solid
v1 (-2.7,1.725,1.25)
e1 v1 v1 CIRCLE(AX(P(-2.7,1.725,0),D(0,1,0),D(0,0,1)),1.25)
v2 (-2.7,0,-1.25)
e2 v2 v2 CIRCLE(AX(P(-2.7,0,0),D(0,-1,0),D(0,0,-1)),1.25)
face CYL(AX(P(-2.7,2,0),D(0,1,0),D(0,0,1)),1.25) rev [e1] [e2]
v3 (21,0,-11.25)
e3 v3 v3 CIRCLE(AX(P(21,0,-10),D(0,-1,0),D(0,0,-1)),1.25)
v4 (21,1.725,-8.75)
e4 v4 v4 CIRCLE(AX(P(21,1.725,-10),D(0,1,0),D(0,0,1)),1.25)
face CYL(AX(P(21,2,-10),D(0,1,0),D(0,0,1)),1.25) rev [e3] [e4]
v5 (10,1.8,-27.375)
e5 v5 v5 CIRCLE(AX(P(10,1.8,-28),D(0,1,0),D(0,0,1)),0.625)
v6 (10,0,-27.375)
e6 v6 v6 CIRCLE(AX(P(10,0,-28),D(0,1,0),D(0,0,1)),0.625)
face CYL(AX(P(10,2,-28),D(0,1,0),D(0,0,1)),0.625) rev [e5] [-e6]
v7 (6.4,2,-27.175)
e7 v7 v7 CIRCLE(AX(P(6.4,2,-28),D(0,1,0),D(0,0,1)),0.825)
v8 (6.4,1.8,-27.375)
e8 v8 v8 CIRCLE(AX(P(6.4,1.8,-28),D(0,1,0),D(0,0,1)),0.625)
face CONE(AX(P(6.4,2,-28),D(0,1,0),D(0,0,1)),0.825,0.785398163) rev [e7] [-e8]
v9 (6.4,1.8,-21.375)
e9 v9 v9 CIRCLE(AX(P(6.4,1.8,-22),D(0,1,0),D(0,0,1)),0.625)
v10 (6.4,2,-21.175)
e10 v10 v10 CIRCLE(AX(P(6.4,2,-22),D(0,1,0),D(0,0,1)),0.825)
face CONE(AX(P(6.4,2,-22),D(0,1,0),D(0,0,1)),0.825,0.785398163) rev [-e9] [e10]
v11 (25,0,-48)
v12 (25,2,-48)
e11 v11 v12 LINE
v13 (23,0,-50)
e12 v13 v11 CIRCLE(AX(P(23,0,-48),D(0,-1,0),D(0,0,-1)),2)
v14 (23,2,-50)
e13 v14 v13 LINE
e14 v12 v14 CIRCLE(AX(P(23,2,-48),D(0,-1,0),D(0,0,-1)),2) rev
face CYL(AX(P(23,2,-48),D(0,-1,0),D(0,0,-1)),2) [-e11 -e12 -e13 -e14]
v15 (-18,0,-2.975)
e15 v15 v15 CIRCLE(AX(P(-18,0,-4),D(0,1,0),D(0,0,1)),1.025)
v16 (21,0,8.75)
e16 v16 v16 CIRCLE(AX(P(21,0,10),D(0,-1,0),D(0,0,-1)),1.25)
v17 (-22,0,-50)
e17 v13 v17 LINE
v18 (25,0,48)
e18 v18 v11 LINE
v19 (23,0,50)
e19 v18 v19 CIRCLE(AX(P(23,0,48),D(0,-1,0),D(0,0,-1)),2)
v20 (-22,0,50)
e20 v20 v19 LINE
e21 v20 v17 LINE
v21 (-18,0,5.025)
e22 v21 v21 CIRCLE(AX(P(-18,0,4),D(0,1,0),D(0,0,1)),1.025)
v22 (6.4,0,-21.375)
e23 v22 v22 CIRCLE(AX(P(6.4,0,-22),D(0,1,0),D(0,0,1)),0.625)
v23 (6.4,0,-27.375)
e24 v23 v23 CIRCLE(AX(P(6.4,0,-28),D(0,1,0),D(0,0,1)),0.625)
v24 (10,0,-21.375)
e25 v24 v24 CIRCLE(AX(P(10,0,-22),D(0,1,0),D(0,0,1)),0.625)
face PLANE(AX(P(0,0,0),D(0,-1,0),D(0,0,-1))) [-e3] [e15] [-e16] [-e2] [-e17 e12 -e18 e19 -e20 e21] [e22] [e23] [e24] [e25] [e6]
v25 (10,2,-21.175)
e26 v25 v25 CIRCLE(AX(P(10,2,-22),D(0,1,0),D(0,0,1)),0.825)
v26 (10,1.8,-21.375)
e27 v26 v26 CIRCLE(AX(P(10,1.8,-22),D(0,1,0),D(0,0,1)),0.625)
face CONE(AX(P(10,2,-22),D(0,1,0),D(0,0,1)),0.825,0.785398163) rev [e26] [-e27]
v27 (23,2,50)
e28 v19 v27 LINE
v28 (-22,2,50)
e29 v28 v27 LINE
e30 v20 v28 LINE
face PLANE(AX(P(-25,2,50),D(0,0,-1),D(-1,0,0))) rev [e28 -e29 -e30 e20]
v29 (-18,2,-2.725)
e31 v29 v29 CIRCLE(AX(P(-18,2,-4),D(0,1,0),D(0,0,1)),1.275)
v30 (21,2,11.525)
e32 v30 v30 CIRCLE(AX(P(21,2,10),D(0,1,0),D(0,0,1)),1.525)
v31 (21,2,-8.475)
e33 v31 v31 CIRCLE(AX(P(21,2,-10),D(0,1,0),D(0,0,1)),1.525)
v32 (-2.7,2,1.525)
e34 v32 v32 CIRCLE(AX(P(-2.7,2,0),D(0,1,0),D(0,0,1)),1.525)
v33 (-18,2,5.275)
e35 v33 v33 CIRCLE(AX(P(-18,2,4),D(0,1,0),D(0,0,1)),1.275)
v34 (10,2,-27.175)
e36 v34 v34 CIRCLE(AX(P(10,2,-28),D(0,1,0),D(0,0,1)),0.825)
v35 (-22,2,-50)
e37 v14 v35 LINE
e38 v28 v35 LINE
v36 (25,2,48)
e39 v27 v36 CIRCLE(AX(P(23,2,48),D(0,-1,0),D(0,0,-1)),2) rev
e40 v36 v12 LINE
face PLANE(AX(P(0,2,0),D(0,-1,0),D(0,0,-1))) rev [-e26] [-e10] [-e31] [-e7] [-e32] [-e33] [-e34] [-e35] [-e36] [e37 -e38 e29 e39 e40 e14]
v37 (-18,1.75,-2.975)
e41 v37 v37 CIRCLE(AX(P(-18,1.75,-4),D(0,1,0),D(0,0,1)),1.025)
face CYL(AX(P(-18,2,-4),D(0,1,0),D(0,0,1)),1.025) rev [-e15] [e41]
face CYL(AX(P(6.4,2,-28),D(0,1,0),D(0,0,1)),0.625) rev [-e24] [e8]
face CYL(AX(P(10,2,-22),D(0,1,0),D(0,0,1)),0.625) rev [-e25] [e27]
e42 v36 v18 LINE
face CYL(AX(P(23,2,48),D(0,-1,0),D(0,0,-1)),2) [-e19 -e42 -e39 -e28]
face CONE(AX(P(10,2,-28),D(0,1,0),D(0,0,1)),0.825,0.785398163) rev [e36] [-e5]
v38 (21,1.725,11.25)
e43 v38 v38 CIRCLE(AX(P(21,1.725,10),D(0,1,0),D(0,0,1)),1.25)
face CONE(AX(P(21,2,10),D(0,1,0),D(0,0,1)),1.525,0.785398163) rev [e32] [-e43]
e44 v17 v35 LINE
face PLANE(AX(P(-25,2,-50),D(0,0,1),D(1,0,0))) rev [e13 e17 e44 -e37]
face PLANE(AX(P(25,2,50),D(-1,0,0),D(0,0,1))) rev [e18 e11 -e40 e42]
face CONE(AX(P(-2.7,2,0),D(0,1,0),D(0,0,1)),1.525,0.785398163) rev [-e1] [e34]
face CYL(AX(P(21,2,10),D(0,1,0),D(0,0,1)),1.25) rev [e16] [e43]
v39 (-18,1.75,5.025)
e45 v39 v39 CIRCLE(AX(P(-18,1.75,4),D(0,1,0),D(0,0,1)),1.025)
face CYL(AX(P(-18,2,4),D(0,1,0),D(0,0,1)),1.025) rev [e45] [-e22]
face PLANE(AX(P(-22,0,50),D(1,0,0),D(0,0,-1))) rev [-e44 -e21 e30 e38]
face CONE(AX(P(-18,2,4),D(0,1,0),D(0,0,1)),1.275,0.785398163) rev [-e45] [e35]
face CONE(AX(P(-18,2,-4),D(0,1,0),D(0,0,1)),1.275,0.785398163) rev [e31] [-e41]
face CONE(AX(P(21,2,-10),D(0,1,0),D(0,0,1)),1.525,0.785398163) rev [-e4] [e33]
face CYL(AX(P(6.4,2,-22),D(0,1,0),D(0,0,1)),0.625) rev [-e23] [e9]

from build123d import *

# Parameters (mm, degrees)
SKETCH_1_W                     = 50
SKETCH_1_H                     = 100
EXTRUDE_1_DEPTH                = 2
SKETCH_2_W                     = 3
SKETCH_2_H                     = 100
EXTRUDE_2_DEPTH                = 80
SKETCH_3_W                     = 2
SKETCH_3_H                     = 66.7
EXTRUDE_3_DEPTH                = 70
CUT_EXTRUDE_4_REACH            = 162.465
SKETCH_8_W                     = 2
SKETCH_8_H                     = 66.7
EXTRUDE_4_DEPTH                = 70
CUT_EXTRUDE_5_REACH            = 140.25
HOLE_WIZARD_M3_1_D             = 2.5
HOLE_WIZARD_M3_1_DEPTH         = 2
HOLE_WIZARD_M3_1_CSINK_D       = 3.05
HOLE_WIZARD_M3_1_CSINK_ANGLE   = 90
FILLET_1_R                     = 2
CUT_EXTRUDE_6_REACH            = 140.25
SKETCH_12_R                    = 11
CUT_EXTRUDE_7_REACH            = 162.465
SKETCH_13_R                    = 14.5
SKETCH_14_W                    = 2
SKETCH_14_H                    = 66.7
EXTRUDE_5_DEPTH                = 70
CUT_EXTRUDE_8_REACH            = 156.14
SKETCH_15_R                    = 5.1
CUT_EXTRUDE_9_DEPTH            = 155.140358116
CUT_EXTRUDE_9_DEPTH_BACK       = 155.140358116
SKETCH_19_W                    = 2
SKETCH_19_H                    = 66.7
CUT_EXTRUDE_10_DEPTH           = 119.844436134
FILLET_2_R                     = 2
HOLE_WIZARD_M3_3_D             = 2.5
HOLE_WIZARD_M3_3_CSINK_D       = 3.05
HOLE_WIZARD_M3_3_CSINK_ANGLE   = 90
CUT_EXTRUDE_11_DEPTH           = 134.88427839
CUT_EXTRUDE_11_DEPTH_BACK      = 134.88427839
SKETCH_28_W                    = 73
SKETCH_28_H                    = 100
HOLE_WIZARD_M2_5_1_D           = 2.05
HOLE_WIZARD_M2_5_1_CSINK_D     = 2.55
HOLE_WIZARD_M2_5_1_CSINK_ANGLE = 90


# Read off the part's stored shape, not the designer's step: M1.6 螺纹孔1, M1.6 螺纹孔2
with BuildPart() as part:
    # 草图1 → 凸台-拉伸1 (new body)
    with BuildSketch(Plane(origin=(0, 0, 0), x_dir=(1, 0, 0), z_dir=(0, 1, 0))):
        Rectangle(SKETCH_1_W, SKETCH_1_H)
    extrude(amount=EXTRUDE_1_DEPTH)

    # 草图2 → 凸台-拉伸2 (add)
    with BuildSketch(Plane(origin=(0, 2, 0), x_dir=(1, 0, 0), z_dir=(0, 1, 0))):
        with Locations((-23.5, 0)):
            Rectangle(SKETCH_2_W, SKETCH_2_H)
    extrude(amount=EXTRUDE_2_DEPTH)

    # 草图3 → 凸台-拉伸3 (add)
    with BuildSketch(Plane.ZY.offset(25)):
        with Locations((-49, 48.65)):
            Rectangle(SKETCH_3_W, SKETCH_3_H)
    extrude(amount=EXTRUDE_3_DEPTH)

    # 草图4 → 切除-拉伸4 (cut, up to next)
    with BuildSketch(Plane(origin=(0, 0, -50), x_dir=(-1, 0, 0), z_dir=(0, 0, -1)), mode=Mode.PRIVATE) as cut_extrude_4_sk1:
        with BuildLine():
            Line((95, 82), (61.65, 82))
            ThreePointArc((61.65, 82), (85.232011153, 72.232011153), (95, 48.65))
            Line((95, 48.65), (95, 82))
        make_face()
    cut_extrude_4_tool1 = extrude(cut_extrude_4_sk1.sketch, amount=-CUT_EXTRUDE_4_REACH, mode=Mode.PRIVATE) & part.part
    # 草图4 → 切除-拉伸4 (cut, up to next)
    with BuildSketch(Plane(origin=(0, 0, -50), x_dir=(-1, 0, 0), z_dir=(0, 0, -1)), mode=Mode.PRIVATE) as cut_extrude_4_sk2:
        with BuildLine():
            ThreePointArc((95, 48.65), (85.232011153, 25.067988847), (61.65, 15.3))
            Line((61.65, 15.3), (95, 15.3))
            Line((95, 15.3), (95, 48.65))
        make_face()
    cut_extrude_4_tool2 = extrude(cut_extrude_4_sk2.sketch, amount=-CUT_EXTRUDE_4_REACH, mode=Mode.PRIVATE) & part.part
    add(cut_extrude_4_tool1.solids().sort_by_distance((-87.550679, 74.550679, -50))[0], mode=Mode.SUBTRACT)
    add(cut_extrude_4_tool2.solids().sort_by_distance((-87.550679, 22.749321, -50))[0], mode=Mode.SUBTRACT)

    # 草图8 → 凸台-拉伸4 (add)
    with BuildSketch(Plane.ZY.offset(25)):
        with Locations((7, 48.65)):
            Rectangle(SKETCH_8_W, SKETCH_8_H)
    extrude(amount=EXTRUDE_4_DEPTH)

    # 草图9 → 切除-拉伸5 (cut, up to next)
    with BuildSketch(Plane.XY.offset(8), mode=Mode.PRIVATE) as cut_extrude_5_sk1:
        with BuildLine():
            ThreePointArc((-95, 48.65), (-85.232011153, 72.232011153), (-61.65, 82))
            Line((-61.65, 82), (-95, 82))
            Line((-95, 82), (-95, 48.65))
        make_face()
    cut_extrude_5_tool1 = extrude(cut_extrude_5_sk1.sketch, amount=-CUT_EXTRUDE_5_REACH, mode=Mode.PRIVATE) & part.part
    # 草图9 → 切除-拉伸5 (cut, up to next)
    with BuildSketch(Plane.XY.offset(8), mode=Mode.PRIVATE) as cut_extrude_5_sk2:
        with BuildLine():
            ThreePointArc((-61.65, 15.3), (-85.232011153, 25.067988847), (-95, 48.65))
            Line((-95, 48.65), (-95, 15.3))
            Line((-95, 15.3), (-61.65, 15.3))
        make_face()
    cut_extrude_5_tool2 = extrude(cut_extrude_5_sk2.sketch, amount=-CUT_EXTRUDE_5_REACH, mode=Mode.PRIVATE) & part.part
    add(cut_extrude_5_tool1.solids().sort_by_distance((-87.550679, 74.550679, 8))[0], mode=Mode.SUBTRACT)
    add(cut_extrude_5_tool2.solids().sort_by_distance((-87.550679, 22.749321, 8))[0], mode=Mode.SUBTRACT)

    # M3 螺纹孔1
    with Locations(Plane.XY.offset(8)):
        with Locations((-78.970508076, 38.65), (-61.65, 68.65), (-44.329491924, 38.65)):
            CounterSinkHole(HOLE_WIZARD_M3_1_D / 2, HOLE_WIZARD_M3_1_CSINK_D / 2, depth=HOLE_WIZARD_M3_1_DEPTH, counter_sink_angle=HOLE_WIZARD_M3_1_CSINK_ANGLE)

    # 圆角1
    fillet_1_edges = [part.edges().sort_by_distance(p)[0] for p in [
        (-23.5, 82, 50),
        (25, 1, 50),
        (25, 1, -50),
    ]]
    fillet(fillet_1_edges, radius=FILLET_1_R)

    # 草图12 → 切除-拉伸6 (cut, up to next)
    with BuildSketch(Plane.XY.offset(8), mode=Mode.PRIVATE) as cut_extrude_6_sk1:
        with Locations((-61.65, 48.65)):
            Circle(SKETCH_12_R)
    cut_extrude_6_tool1 = extrude(cut_extrude_6_sk1.sketch, amount=-CUT_EXTRUDE_6_REACH, mode=Mode.PRIVATE) & part.part
    add(cut_extrude_6_tool1.solids().sort_by_distance((-61.65, 48.65, 8))[0], mode=Mode.SUBTRACT)

    # 草图13 → 切除-拉伸7 (cut, up to next)
    with BuildSketch(Plane(origin=(0, 0, -50), x_dir=(-1, 0, 0), z_dir=(0, 0, -1)), mode=Mode.PRIVATE) as cut_extrude_7_sk1:
        with Locations((61.65, 48.65)):
            Circle(SKETCH_13_R)
    cut_extrude_7_tool1 = extrude(cut_extrude_7_sk1.sketch, amount=-CUT_EXTRUDE_7_REACH, mode=Mode.PRIVATE) & part.part
    add(cut_extrude_7_tool1.solids().sort_by_distance((-61.65, 48.65, -50))[0], mode=Mode.SUBTRACT)

    # 草图14 → 凸台-拉伸5 (add)
    with BuildSketch(Plane.ZY.offset(25)):
        with Locations((-38.5, 48.65)):
            Rectangle(SKETCH_14_W, SKETCH_14_H)
    extrude(amount=EXTRUDE_5_DEPTH)

    # 草图15 → 切除-拉伸8 (cut, up to next)
    with BuildSketch(Plane(origin=(0, 0, -39.5), x_dir=(-1, 0, 0), z_dir=(0, 0, -1)), mode=Mode.PRIVATE) as cut_extrude_8_sk1:
        with Locations(Location((61.65, 48.65, 0), (0, 0, 90))):
            Circle(SKETCH_15_R)
    cut_extrude_8_tool1 = extrude(cut_extrude_8_sk1.sketch, amount=-CUT_EXTRUDE_8_REACH, mode=Mode.PRIVATE) & part.part
    add(cut_extrude_8_tool1.solids().sort_by_distance((-61.65, 48.65, -39.5))[0], mode=Mode.SUBTRACT)

    # 草图18 → 切除-拉伸9 (cut, two sides: drawn at the far end of the back side and taken through both)
    with BuildSketch(Plane(origin=(0, 0, -39.5), x_dir=(-1, 0, 0), z_dir=(0, 0, -1)).offset(-CUT_EXTRUDE_9_DEPTH_BACK)):
        with BuildLine():
            Line((95, 15.3), (95, 48.65))
            ThreePointArc((95, 48.65), (85.232011153, 25.067988847), (61.65, 15.3))
            Line((61.65, 15.3), (95, 15.3))
        make_face()
        with BuildLine():
            Line((95, 48.65), (95, 82))
            Line((95, 82), (61.65, 82))
            ThreePointArc((61.65, 82), (85.232011153, 72.232011153), (95, 48.65))
        make_face()
    extrude(amount=CUT_EXTRUDE_9_DEPTH + CUT_EXTRUDE_9_DEPTH_BACK, mode=Mode.SUBTRACT)

    # 草图19 → 切除-拉伸10 (cut, through all)
    with BuildSketch(Plane.ZY.offset(25)):
        with Locations((-49, 48.65)):
            Rectangle(SKETCH_19_W, SKETCH_19_H)
    extrude(amount=CUT_EXTRUDE_10_DEPTH, mode=Mode.SUBTRACT)

    # 圆角2
    fillet_2_edges = [part.edges().sort_by_distance(p)[0] for p in [
        (-23.5, 82, -50),
    ]]
    fillet(fillet_2_edges, radius=FILLET_2_R)

    # M3 螺纹孔3 (through all)
    with Locations(Plane(origin=(0, 2, 0), x_dir=(1, 0, 0), z_dir=(0, 1, 0))):
        with Locations((-2.7, 0), (21, 10), (21, -10)):
            CounterSinkHole(HOLE_WIZARD_M3_3_D / 2, HOLE_WIZARD_M3_3_CSINK_D / 2, counter_sink_angle=HOLE_WIZARD_M3_3_CSINK_ANGLE)

    # M1.6 螺纹孔1 outline → M1.6 螺纹孔1 (revolve, cut)
    with BuildSketch(Plane(origin=(10, 0, -28), x_dir=(1, 0, 0), z_dir=(0, 0, 1))):
        Polygon((0, 0), (0.625, 0), (0.625, 1.8), (0.825, 2), (0, 2), align=None)
    revolve(axis=Axis((10, 0, -28), (0, 1, 0)), mode=Mode.SUBTRACT)

    # Hole Wizard M1.6 _1 2 outline → Hole Wizard M1.6 _1 2 (revolve, cut)
    with BuildSketch(Plane(origin=(6.4, 0, -28), x_dir=(1, 0, 0), z_dir=(0, 0, 1))):
        Polygon((0, 0), (0.625, 0), (0.625, 1.8), (0.825, 2), (0, 2), align=None)
    revolve(axis=Axis((6.4, 0, -28), (0, 1, 0)), mode=Mode.SUBTRACT)

    # M1.6 螺纹孔2 outline → M1.6 螺纹孔2 (revolve, cut)
    with BuildSketch(Plane(origin=(10, 0, -22), x_dir=(1, 0, 0), z_dir=(0, 0, 1))):
        Polygon((0, 0), (0.625, 0), (0.625, 1.8), (0.825, 2), (0, 2), align=None)
    revolve(axis=Axis((10, 0, -22), (0, 1, 0)), mode=Mode.SUBTRACT)

    # Hole Wizard M1.6 _2 2 outline → Hole Wizard M1.6 _2 2 (revolve, cut)
    with BuildSketch(Plane(origin=(6.4, 0, -22), x_dir=(1, 0, 0), z_dir=(0, 0, 1))):
        Polygon((0, 0), (0.625, 0), (0.625, 1.8), (0.825, 2), (0, 2), align=None)
    revolve(axis=Axis((6.4, 0, -22), (0, 1, 0)), mode=Mode.SUBTRACT)

    # 草图28 → 切除-拉伸11 (cut, two sides: drawn at the far end of the back side and taken through both)
    with BuildSketch(Plane(origin=(0, 2, 0), x_dir=(1, 0, 0), z_dir=(0, 1, 0)).offset(-CUT_EXTRUDE_11_DEPTH_BACK)):
        with Locations((-58.5, 0)):
            Rectangle(SKETCH_28_W, SKETCH_28_H)
    extrude(amount=CUT_EXTRUDE_11_DEPTH + CUT_EXTRUDE_11_DEPTH_BACK, mode=Mode.SUBTRACT)

    # M2.5 螺纹孔1 (through all)
    with Locations(Plane(origin=(0, 2, 0), x_dir=(1, 0, 0), z_dir=(0, 1, 0))):
        with Locations((-18, 4), (-18, -4)):
            CounterSinkHole(HOLE_WIZARD_M2_5_1_D / 2, HOLE_WIZARD_M2_5_1_CSINK_D / 2, counter_sink_angle=HOLE_WIZARD_M2_5_1_CSINK_ANGLE)


solid = part.part
